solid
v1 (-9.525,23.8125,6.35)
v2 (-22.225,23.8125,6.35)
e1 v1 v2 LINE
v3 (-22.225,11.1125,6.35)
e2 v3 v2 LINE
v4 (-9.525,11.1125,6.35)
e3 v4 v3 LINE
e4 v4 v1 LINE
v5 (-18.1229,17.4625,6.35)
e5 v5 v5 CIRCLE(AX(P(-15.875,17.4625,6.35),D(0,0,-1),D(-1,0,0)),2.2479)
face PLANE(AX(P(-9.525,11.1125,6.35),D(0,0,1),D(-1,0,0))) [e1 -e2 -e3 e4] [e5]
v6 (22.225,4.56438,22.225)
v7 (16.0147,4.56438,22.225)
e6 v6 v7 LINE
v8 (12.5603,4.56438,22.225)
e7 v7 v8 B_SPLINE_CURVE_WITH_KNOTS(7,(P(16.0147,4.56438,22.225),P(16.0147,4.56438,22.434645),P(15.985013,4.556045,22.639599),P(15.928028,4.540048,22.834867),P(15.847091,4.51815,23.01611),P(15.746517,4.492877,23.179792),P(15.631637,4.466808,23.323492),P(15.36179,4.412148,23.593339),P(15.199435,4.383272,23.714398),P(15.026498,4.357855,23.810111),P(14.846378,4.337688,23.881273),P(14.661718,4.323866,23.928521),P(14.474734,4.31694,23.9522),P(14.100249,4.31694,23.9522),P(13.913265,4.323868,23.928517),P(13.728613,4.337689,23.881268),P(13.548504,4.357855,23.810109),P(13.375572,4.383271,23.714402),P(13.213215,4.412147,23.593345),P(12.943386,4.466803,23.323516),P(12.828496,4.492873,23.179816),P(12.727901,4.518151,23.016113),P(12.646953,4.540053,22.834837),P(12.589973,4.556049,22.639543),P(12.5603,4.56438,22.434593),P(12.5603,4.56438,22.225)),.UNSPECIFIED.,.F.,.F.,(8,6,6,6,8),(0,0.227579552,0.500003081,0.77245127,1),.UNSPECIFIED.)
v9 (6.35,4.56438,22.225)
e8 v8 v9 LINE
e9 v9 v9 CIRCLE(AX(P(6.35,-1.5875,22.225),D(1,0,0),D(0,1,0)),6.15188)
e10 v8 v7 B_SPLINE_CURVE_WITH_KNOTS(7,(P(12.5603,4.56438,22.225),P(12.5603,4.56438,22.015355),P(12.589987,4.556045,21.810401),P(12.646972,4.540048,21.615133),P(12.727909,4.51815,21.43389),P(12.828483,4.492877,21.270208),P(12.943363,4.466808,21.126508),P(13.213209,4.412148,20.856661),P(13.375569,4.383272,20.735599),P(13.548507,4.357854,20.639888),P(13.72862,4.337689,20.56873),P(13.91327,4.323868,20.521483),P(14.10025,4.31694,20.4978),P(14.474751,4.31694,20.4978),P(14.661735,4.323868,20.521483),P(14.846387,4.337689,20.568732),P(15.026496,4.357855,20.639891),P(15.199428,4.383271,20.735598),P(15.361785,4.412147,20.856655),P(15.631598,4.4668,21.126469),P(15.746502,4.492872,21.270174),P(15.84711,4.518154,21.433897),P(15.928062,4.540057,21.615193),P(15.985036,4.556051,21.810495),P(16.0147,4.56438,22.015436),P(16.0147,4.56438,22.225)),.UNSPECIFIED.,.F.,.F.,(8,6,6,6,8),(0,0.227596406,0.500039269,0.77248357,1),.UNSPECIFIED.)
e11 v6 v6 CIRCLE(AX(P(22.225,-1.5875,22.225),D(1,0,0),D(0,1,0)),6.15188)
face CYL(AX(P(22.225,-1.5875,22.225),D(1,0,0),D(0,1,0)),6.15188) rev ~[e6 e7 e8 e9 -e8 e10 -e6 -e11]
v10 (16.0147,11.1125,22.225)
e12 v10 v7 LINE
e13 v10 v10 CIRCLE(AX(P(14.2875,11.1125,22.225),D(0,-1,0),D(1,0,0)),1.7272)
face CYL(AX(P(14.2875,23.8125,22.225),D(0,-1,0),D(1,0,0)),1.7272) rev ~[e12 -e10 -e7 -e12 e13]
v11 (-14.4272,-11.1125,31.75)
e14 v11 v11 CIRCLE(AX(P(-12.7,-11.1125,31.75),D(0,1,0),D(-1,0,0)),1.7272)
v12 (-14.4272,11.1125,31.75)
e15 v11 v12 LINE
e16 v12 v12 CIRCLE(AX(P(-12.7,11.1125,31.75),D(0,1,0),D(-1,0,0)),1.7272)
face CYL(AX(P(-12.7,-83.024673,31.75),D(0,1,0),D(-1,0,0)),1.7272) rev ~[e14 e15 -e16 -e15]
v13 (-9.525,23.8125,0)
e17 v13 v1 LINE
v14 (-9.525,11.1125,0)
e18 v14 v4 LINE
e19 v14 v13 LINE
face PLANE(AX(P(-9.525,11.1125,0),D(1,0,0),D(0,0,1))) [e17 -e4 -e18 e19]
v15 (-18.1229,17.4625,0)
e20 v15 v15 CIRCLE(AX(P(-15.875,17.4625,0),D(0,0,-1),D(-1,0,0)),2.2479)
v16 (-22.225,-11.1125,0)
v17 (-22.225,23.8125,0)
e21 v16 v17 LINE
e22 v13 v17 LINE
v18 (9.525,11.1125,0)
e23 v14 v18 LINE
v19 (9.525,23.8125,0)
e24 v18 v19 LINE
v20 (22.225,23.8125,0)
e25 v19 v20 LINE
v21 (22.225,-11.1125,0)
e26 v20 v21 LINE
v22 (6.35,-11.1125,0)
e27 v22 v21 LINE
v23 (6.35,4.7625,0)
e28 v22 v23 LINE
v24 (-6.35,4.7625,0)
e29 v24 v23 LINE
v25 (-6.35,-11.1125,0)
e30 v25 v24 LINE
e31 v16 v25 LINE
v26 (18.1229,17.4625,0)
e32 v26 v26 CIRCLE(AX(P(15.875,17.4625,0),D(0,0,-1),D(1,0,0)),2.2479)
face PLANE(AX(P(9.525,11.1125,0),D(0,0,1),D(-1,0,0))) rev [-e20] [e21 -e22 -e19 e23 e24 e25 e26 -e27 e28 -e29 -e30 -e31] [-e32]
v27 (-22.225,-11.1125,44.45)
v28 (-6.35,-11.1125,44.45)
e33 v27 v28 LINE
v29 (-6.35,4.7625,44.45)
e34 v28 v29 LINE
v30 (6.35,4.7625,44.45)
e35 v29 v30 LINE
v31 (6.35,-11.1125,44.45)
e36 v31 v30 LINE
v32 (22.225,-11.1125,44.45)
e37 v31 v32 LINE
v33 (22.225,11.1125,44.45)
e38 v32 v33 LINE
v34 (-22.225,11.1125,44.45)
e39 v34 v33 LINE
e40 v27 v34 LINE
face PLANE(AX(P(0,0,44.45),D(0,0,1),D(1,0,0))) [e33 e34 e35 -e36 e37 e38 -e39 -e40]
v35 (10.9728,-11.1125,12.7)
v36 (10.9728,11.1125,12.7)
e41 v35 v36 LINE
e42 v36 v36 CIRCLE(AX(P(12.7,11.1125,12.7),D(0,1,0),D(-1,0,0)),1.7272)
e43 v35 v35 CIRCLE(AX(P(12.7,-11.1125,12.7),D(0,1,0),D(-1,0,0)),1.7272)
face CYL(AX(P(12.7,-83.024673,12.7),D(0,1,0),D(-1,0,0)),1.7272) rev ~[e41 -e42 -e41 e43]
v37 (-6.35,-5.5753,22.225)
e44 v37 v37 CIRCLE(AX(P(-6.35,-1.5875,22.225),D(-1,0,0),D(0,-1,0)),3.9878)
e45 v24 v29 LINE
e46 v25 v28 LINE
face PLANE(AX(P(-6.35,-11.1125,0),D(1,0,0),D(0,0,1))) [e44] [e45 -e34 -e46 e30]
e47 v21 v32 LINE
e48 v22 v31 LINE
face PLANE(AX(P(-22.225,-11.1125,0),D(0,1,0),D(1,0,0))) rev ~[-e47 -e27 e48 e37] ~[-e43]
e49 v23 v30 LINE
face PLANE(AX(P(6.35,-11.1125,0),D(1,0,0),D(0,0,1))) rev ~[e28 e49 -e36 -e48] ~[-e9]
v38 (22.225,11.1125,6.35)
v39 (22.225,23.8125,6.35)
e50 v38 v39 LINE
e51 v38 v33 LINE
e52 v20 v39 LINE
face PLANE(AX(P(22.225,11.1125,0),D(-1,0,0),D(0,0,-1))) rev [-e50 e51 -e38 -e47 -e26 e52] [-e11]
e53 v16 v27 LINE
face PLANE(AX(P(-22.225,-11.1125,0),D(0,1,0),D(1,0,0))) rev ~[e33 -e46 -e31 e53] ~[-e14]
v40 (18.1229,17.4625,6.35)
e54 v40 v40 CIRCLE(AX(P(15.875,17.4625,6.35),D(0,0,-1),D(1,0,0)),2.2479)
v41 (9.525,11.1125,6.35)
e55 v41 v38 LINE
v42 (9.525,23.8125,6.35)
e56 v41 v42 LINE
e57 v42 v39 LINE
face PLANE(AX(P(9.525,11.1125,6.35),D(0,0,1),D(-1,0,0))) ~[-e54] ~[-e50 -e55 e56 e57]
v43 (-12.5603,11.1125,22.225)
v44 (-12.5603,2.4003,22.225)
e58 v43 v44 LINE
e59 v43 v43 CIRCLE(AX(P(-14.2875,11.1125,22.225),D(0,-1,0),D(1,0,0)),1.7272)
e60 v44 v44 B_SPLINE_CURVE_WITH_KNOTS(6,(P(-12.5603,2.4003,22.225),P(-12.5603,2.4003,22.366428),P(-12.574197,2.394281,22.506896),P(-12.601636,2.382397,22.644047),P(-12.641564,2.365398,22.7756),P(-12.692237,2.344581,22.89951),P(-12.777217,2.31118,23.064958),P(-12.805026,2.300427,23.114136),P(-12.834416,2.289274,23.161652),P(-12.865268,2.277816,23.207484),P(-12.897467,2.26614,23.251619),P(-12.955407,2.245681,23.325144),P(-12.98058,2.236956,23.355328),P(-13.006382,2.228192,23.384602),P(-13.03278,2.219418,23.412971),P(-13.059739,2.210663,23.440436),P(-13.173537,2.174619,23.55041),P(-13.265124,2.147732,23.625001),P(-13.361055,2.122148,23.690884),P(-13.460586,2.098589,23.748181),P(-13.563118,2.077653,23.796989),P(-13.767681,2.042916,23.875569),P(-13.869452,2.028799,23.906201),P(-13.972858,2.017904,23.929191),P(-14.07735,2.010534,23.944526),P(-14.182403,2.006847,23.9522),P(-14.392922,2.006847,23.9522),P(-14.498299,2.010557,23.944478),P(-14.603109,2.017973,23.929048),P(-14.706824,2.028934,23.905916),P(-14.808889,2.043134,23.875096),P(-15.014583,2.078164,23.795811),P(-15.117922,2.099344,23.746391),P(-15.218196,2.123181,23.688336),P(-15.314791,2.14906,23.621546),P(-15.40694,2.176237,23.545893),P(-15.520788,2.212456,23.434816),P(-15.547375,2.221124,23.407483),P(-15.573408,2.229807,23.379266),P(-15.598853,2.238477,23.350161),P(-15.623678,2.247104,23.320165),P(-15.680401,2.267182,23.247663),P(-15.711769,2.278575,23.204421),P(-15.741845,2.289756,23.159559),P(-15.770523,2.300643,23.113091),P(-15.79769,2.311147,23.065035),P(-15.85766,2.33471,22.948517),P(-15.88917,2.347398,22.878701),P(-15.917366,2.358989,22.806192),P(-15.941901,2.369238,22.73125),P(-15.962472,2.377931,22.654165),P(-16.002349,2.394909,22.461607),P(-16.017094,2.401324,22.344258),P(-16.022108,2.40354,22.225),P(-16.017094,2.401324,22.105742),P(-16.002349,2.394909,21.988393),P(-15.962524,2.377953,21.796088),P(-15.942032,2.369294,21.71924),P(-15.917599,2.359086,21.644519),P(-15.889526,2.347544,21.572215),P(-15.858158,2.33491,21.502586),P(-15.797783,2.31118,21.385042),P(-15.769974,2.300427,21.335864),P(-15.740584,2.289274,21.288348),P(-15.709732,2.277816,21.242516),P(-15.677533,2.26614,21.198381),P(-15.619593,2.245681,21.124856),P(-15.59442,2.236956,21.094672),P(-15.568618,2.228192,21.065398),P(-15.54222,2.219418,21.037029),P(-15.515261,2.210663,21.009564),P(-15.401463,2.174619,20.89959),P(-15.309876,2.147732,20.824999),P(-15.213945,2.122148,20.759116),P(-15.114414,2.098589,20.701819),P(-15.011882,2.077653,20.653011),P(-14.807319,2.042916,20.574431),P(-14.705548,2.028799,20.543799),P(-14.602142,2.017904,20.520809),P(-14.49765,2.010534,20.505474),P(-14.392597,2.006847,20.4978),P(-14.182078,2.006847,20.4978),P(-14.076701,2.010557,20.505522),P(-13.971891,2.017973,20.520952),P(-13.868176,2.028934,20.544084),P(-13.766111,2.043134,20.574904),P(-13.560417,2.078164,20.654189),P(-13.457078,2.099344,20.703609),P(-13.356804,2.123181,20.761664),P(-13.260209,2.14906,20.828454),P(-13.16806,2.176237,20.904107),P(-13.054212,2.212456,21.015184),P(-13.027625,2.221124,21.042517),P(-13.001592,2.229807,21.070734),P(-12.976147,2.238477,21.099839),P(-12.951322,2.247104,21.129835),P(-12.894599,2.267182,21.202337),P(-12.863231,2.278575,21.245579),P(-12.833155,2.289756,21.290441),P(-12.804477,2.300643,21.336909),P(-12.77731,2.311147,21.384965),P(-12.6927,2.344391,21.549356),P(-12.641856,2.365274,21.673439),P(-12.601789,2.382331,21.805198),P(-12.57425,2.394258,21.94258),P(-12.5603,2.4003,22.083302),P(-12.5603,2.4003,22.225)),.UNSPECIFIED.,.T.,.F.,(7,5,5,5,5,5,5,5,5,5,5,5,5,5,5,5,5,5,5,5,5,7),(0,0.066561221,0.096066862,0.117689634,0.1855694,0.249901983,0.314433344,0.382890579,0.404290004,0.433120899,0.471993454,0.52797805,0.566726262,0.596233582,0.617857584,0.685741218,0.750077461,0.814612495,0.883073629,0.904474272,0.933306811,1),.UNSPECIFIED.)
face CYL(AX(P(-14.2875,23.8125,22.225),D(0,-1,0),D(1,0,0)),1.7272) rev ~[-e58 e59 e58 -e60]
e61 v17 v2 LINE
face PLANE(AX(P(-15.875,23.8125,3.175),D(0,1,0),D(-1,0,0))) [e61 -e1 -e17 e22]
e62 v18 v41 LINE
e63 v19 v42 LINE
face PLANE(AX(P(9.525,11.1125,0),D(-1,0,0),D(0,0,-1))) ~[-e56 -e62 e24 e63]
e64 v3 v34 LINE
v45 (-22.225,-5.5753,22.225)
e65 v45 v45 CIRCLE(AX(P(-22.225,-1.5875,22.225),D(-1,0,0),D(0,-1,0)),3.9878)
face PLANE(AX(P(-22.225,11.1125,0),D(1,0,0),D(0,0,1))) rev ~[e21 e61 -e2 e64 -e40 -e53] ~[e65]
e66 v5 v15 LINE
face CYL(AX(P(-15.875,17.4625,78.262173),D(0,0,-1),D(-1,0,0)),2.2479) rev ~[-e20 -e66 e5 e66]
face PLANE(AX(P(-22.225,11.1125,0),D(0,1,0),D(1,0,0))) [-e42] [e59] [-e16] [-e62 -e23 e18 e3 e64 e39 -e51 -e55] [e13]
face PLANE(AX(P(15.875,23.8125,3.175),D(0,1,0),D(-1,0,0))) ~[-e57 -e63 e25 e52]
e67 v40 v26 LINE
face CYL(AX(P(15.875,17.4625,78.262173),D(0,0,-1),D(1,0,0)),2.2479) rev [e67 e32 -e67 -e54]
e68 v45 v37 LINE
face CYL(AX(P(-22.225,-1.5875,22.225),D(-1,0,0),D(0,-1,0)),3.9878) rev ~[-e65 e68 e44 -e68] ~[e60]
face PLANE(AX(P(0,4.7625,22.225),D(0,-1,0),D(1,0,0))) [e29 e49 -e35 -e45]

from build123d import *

# Parameters (mm, degrees)
F0_W      = 44.45
F0_H      = 22.225
F1_DEPTH  = 44.45
F2_W      = 12.7
F2_H      = 44.45
F3_DEPTH  = 15.875
F5_W      = 12.7
F5_H      = 6.35
F6_DEPTH  = 12.7
F8_D      = 4.4958
F10_D     = 3.4544
F12_R     = 3.9878
F13_DEPTH = 44.451
F14_R     = 6.15188
F15_DEPTH = 28.575
F17_D     = 3.4544
F17_DEPTH = 12.7
F17_TIP   = 1.0378064612


# Not quite as in the source:
# - an extrude ends at something that could not be found from the text; its depth is read off the source's solid
# - a pattern or mirror of a feature is missing from the dataset's text; its kind, count and spacing are read off the source's solid


with BuildPart() as f1:
    # F0 (on Top) → F1 (new body)
    with BuildSketch(Plane.XY):
        Rectangle(F0_W, F0_H)
    extrude(amount=F1_DEPTH)

    # F2 (on face) → F3 (cut)
    with BuildSketch(Plane.XZ.offset(11.1125)):
        with Locations((0, 22.225)):
            Rectangle(F2_W, F2_H)
    extrude(amount=-F3_DEPTH, mode=Mode.SUBTRACT)

    # F5 (on face) → F6 (join)
    with BuildSketch(Plane(origin=(0, 11.1125, 0), x_dir=(-1, 0, 0), z_dir=(0, 1, 0))):
        with Locations((15.875, 3.175)):
            Rectangle(F5_W, F5_H)
    f6 = extrude(amount=F6_DEPTH)

    # F6_copies: F6 across plane
    add(f6.mirror(Plane(origin=(0, 0, 0), x_dir=(0, 0, 1), z_dir=(1, 0, 0))))

    # F8 (through all)
    with Locations(Plane.XY.offset(6.35)):
        with Locations((-15.875, 17.4625)):
            f8 = Hole(F8_D / 2)

    # F8_copies: F8 across plane
    add(f8.mirror(Plane(origin=(0, 0, 0), x_dir=(0, 0, 1), z_dir=(1, 0, 0))), mode=Mode.SUBTRACT)

    # F10 (through all)
    with Locations(Plane.XZ.offset(11.1125)):
        with Locations((-12.7, 31.75), (12.7, 12.7)):
            Hole(F10_D / 2)

    # F12 (on face) → F13 (cut, through all)
    with BuildSketch(Plane(origin=(-22.225, 0, 0), x_dir=(0, -1, 0), z_dir=(-1, 0, 0))):
        with Locations((1.5875, 22.225)):
            Circle(F12_R)
    extrude(amount=-F13_DEPTH, mode=Mode.SUBTRACT)

    # F14 (on face) → F15 (cut, through all)
    with BuildSketch(Plane.YZ.offset(22.225)):
        with Locations((-1.5875, 22.225)):
            Circle(F14_R)
    extrude(amount=-F15_DEPTH, mode=Mode.SUBTRACT)

    # F17
    with Locations(Plane(origin=(0, 11.1125, 0), x_dir=(-1, 0, 0), z_dir=(0, 1, 0))):
        with Locations((-14.2875, 22.225), (14.2875, 22.225)):
            Hole(F17_D / 2, depth=F17_DEPTH)
            with Locations((0, 0, -(F17_DEPTH + F17_TIP / 2))):  # 118° drill point
                Cone(0, F17_D / 2, F17_TIP, mode=Mode.SUBTRACT)


solid = f1.part
